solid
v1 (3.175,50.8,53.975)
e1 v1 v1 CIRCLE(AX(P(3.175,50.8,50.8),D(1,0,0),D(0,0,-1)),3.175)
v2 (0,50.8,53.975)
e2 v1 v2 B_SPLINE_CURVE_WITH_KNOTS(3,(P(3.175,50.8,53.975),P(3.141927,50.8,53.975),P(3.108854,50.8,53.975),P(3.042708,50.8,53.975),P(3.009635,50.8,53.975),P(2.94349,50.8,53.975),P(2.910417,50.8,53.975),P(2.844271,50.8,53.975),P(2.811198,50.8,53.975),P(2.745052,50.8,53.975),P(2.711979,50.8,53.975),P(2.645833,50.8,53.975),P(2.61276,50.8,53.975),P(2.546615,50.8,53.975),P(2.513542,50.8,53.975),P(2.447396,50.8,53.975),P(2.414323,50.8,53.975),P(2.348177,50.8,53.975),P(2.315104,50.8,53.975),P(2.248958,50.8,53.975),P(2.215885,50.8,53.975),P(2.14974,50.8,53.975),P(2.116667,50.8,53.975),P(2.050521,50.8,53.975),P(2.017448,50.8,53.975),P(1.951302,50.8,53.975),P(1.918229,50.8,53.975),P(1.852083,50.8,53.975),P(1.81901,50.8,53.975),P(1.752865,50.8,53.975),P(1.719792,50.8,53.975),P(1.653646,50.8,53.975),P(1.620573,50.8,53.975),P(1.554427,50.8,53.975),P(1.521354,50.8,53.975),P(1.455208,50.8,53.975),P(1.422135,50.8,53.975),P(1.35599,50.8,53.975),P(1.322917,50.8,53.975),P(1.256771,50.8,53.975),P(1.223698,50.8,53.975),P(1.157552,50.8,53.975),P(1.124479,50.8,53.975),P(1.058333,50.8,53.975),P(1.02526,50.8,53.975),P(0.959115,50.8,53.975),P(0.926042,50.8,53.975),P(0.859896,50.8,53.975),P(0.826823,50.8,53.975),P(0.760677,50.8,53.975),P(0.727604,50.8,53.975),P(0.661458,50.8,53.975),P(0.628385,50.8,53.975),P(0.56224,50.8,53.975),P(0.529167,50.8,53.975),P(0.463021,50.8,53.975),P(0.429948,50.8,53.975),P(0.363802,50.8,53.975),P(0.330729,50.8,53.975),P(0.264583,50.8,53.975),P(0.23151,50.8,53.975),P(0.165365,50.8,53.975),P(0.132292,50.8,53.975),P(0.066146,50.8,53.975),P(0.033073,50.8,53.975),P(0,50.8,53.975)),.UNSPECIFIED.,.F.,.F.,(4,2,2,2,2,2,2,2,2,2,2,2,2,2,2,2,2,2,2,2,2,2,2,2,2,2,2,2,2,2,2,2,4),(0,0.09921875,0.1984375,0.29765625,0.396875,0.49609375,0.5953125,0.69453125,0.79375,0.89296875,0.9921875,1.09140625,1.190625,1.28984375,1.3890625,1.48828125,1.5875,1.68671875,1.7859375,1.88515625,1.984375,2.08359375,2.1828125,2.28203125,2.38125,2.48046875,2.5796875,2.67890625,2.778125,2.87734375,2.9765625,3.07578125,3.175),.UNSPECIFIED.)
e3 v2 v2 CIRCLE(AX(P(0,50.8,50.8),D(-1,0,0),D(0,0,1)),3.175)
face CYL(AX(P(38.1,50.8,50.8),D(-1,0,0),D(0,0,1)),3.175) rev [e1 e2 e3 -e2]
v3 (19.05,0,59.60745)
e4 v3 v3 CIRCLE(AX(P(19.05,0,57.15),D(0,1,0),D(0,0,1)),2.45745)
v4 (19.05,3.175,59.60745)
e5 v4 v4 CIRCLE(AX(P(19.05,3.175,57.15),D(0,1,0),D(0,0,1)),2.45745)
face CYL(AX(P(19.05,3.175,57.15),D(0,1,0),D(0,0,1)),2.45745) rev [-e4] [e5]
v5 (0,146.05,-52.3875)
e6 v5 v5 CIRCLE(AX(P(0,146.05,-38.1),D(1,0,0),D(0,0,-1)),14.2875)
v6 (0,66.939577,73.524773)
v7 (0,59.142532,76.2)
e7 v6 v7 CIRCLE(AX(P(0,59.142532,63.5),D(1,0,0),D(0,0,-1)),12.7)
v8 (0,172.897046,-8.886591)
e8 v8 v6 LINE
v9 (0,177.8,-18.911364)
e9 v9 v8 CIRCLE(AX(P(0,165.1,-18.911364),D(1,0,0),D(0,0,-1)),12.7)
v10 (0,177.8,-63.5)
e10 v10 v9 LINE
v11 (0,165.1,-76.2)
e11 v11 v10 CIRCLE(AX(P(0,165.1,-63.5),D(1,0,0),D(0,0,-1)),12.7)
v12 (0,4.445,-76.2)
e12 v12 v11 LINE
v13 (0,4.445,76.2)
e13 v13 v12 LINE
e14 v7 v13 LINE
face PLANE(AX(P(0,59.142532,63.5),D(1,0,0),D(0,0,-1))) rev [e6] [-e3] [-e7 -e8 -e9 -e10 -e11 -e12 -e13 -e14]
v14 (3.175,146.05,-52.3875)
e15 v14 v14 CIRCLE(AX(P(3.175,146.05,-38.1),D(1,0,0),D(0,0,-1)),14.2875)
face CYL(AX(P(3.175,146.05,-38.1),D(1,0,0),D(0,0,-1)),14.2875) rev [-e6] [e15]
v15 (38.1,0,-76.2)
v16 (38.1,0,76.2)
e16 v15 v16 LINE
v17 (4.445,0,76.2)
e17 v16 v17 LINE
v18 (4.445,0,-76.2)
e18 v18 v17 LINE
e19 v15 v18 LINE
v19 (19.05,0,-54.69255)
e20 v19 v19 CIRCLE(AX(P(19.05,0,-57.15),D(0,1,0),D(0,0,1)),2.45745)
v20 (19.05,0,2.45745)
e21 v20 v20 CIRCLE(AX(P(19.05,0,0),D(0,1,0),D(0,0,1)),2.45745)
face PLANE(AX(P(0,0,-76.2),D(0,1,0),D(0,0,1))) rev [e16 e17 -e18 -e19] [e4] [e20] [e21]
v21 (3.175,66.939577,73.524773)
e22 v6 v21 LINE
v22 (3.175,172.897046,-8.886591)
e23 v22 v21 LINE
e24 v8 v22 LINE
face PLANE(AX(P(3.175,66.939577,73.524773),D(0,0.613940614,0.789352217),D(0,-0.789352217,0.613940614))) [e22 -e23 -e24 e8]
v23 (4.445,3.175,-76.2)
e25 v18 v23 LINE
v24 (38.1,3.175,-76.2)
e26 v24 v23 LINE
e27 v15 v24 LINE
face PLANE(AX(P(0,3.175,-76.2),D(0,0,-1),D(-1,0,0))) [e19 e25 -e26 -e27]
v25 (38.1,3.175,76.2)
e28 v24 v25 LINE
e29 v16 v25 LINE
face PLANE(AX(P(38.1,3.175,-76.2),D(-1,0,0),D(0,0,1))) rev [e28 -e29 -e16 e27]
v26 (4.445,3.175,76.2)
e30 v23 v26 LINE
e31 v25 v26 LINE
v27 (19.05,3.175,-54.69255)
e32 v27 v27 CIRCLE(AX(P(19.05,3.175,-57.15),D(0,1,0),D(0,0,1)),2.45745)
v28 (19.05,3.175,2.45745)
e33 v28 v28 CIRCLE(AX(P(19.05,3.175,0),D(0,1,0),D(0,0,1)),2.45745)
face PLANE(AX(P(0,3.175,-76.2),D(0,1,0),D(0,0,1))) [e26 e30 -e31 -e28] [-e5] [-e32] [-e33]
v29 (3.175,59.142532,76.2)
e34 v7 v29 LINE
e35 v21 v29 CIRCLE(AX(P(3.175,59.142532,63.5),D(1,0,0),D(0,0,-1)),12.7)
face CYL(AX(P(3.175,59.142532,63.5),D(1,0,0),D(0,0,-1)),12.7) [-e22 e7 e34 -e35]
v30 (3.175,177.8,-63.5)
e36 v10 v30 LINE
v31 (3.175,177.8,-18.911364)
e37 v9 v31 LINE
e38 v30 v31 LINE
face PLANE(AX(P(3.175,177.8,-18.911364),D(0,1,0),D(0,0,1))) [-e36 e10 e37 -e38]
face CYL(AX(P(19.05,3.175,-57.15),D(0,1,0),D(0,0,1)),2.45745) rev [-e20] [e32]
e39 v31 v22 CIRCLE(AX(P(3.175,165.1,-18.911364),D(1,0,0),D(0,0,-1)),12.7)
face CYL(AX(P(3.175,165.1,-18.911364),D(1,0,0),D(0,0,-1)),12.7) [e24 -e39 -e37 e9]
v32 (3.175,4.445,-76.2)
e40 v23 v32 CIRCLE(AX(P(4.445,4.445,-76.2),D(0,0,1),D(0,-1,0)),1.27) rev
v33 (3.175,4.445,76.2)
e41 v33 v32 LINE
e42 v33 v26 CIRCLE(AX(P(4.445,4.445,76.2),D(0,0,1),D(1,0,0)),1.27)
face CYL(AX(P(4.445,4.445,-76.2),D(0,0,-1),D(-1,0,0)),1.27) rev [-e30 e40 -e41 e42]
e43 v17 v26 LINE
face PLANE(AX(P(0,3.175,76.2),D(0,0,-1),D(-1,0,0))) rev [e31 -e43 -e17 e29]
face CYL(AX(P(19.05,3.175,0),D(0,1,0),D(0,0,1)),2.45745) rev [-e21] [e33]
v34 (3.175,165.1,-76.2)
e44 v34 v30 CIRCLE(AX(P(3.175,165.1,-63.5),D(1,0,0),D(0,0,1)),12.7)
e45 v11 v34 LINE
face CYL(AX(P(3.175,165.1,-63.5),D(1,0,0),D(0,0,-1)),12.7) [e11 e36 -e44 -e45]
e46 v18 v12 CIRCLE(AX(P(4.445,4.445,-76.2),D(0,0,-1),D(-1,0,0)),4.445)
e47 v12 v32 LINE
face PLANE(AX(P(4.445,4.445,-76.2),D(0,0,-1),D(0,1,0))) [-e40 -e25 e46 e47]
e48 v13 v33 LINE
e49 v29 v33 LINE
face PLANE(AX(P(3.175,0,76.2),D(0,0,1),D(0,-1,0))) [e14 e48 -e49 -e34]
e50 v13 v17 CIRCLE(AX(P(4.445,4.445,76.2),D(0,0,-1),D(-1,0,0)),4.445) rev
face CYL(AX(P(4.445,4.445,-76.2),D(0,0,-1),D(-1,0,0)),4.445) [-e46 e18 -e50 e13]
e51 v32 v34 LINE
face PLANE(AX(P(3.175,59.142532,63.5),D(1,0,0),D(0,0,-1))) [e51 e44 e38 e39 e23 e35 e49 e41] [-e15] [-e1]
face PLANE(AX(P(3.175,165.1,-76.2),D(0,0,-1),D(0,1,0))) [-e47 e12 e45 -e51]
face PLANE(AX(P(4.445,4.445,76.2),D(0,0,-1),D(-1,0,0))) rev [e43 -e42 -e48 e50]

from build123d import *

# Parameters (mm, degrees)
SKETCH1_R              = 14.2875
BOSS_EXTRUDE1_DEPTH    = 3.175
SKETCH2_W              = 38.1
SKETCH2_H              = 3.175
BOSS_EXTRUDE2_DEPTH    = 152.4
SKETCH3_R              = 2.45745
CUT_EXTRUDE1_DEPTH     = 195.298586266
CONVERT_SOLID1_START   = -76.2
CONVERT_SOLID1_DEPTH   = 152.4
CONVERT_SOLID1_2_DEPTH = 152.4
SKETCH4_R              = 3.175
CUT_EXTRUDE3_DEPTH     = 198.157018643


# Read off the part's stored shape, not the designer's step: Convert-Solid1
with BuildPart() as part:
    # Sketch1 → Boss-Extrude1 (new body)
    with BuildSketch(Plane(origin=(0, 0, 0), x_dir=(0, 0, -1), z_dir=(1, 0, 0))):
        with BuildLine():
            Line((-76.2, 0), (-76.2, 59.142531573))
            ThreePointArc((-76.2, 59.142531573), (-75.512589628, 63.264144174), (-73.524773161, 66.939577365))
            Line((-73.524773161, 66.939577365), (8.886591171, 172.897045792))
            ThreePointArc((8.886591171, 172.897045792), (13.331600966, 176.508603805), (18.911364332, 177.8))
            Line((18.911364332, 177.8), (63.5, 177.8))
            ThreePointArc((63.5, 177.8), (72.480256121, 174.080256121), (76.2, 165.1))
            Line((76.2, 165.1), (76.2, 0))
            Line((76.2, 0), (-76.2, 0))
        make_face()
        with Locations((38.1, 146.05)):
            Circle(SKETCH1_R, mode=Mode.SUBTRACT)
    extrude(amount=BOSS_EXTRUDE1_DEPTH)

    # Sketch2 → Boss-Extrude2 (add)
    with BuildSketch(Plane.XY.offset(76.2)):
        with Locations((19.05, 1.5875)):
            Rectangle(SKETCH2_W, SKETCH2_H)
    extrude(amount=-BOSS_EXTRUDE2_DEPTH)

    # Sketch3 → Cut-Extrude1 (cut, through all)
    with BuildSketch(Plane(origin=(0, 3.175, 0), x_dir=(1, 0, 0), z_dir=(0, 1, 0))):
        with Locations(Location((19.05, 57.15, 0), (0, 0, 270))):
            Circle(SKETCH3_R)
        with Locations(Location((19.05, 0, 0), (0, 0, 270))):
            Circle(SKETCH3_R)
        with Locations(Location((19.05, -57.15, 0), (0, 0, 270))):
            Circle(SKETCH3_R)
    extrude(amount=-CUT_EXTRUDE1_DEPTH, mode=Mode.SUBTRACT)

    # Convert-Solid1 outline → Convert-Solid1 (cut)
    with BuildSketch(Plane.XY.offset(CONVERT_SOLID1_START)):
        with BuildLine():
            Line((0, 0), (4.445, 0))
            ThreePointArc((4.445, 0), (1.301910358, 1.301910358), (0, 4.445))
            Line((0, 4.445), (0, 0))
        make_face()
    extrude(amount=CONVERT_SOLID1_DEPTH, mode=Mode.SUBTRACT)

    # Convert-Solid1 2 outline → Convert-Solid1 2 (add)
    with BuildSketch(Plane.XY.offset(CONVERT_SOLID1_START)):
        with BuildLine():
            Line((3.175, 3.175), (4.445, 3.175))
            ThreePointArc((4.445, 3.175), (3.546974388, 3.546974388), (3.175, 4.445))
            Line((3.175, 4.445), (3.175, 3.175))
        make_face()
    extrude(amount=CONVERT_SOLID1_2_DEPTH)

    # Sketch4 → Cut-Extrude3 (cut, through all)
    with BuildSketch(Plane.ZY):
        with Locations((50.8, 50.8)):
            Circle(SKETCH4_R)
    extrude(amount=-CUT_EXTRUDE3_DEPTH, mode=Mode.SUBTRACT)


solid = part.part
